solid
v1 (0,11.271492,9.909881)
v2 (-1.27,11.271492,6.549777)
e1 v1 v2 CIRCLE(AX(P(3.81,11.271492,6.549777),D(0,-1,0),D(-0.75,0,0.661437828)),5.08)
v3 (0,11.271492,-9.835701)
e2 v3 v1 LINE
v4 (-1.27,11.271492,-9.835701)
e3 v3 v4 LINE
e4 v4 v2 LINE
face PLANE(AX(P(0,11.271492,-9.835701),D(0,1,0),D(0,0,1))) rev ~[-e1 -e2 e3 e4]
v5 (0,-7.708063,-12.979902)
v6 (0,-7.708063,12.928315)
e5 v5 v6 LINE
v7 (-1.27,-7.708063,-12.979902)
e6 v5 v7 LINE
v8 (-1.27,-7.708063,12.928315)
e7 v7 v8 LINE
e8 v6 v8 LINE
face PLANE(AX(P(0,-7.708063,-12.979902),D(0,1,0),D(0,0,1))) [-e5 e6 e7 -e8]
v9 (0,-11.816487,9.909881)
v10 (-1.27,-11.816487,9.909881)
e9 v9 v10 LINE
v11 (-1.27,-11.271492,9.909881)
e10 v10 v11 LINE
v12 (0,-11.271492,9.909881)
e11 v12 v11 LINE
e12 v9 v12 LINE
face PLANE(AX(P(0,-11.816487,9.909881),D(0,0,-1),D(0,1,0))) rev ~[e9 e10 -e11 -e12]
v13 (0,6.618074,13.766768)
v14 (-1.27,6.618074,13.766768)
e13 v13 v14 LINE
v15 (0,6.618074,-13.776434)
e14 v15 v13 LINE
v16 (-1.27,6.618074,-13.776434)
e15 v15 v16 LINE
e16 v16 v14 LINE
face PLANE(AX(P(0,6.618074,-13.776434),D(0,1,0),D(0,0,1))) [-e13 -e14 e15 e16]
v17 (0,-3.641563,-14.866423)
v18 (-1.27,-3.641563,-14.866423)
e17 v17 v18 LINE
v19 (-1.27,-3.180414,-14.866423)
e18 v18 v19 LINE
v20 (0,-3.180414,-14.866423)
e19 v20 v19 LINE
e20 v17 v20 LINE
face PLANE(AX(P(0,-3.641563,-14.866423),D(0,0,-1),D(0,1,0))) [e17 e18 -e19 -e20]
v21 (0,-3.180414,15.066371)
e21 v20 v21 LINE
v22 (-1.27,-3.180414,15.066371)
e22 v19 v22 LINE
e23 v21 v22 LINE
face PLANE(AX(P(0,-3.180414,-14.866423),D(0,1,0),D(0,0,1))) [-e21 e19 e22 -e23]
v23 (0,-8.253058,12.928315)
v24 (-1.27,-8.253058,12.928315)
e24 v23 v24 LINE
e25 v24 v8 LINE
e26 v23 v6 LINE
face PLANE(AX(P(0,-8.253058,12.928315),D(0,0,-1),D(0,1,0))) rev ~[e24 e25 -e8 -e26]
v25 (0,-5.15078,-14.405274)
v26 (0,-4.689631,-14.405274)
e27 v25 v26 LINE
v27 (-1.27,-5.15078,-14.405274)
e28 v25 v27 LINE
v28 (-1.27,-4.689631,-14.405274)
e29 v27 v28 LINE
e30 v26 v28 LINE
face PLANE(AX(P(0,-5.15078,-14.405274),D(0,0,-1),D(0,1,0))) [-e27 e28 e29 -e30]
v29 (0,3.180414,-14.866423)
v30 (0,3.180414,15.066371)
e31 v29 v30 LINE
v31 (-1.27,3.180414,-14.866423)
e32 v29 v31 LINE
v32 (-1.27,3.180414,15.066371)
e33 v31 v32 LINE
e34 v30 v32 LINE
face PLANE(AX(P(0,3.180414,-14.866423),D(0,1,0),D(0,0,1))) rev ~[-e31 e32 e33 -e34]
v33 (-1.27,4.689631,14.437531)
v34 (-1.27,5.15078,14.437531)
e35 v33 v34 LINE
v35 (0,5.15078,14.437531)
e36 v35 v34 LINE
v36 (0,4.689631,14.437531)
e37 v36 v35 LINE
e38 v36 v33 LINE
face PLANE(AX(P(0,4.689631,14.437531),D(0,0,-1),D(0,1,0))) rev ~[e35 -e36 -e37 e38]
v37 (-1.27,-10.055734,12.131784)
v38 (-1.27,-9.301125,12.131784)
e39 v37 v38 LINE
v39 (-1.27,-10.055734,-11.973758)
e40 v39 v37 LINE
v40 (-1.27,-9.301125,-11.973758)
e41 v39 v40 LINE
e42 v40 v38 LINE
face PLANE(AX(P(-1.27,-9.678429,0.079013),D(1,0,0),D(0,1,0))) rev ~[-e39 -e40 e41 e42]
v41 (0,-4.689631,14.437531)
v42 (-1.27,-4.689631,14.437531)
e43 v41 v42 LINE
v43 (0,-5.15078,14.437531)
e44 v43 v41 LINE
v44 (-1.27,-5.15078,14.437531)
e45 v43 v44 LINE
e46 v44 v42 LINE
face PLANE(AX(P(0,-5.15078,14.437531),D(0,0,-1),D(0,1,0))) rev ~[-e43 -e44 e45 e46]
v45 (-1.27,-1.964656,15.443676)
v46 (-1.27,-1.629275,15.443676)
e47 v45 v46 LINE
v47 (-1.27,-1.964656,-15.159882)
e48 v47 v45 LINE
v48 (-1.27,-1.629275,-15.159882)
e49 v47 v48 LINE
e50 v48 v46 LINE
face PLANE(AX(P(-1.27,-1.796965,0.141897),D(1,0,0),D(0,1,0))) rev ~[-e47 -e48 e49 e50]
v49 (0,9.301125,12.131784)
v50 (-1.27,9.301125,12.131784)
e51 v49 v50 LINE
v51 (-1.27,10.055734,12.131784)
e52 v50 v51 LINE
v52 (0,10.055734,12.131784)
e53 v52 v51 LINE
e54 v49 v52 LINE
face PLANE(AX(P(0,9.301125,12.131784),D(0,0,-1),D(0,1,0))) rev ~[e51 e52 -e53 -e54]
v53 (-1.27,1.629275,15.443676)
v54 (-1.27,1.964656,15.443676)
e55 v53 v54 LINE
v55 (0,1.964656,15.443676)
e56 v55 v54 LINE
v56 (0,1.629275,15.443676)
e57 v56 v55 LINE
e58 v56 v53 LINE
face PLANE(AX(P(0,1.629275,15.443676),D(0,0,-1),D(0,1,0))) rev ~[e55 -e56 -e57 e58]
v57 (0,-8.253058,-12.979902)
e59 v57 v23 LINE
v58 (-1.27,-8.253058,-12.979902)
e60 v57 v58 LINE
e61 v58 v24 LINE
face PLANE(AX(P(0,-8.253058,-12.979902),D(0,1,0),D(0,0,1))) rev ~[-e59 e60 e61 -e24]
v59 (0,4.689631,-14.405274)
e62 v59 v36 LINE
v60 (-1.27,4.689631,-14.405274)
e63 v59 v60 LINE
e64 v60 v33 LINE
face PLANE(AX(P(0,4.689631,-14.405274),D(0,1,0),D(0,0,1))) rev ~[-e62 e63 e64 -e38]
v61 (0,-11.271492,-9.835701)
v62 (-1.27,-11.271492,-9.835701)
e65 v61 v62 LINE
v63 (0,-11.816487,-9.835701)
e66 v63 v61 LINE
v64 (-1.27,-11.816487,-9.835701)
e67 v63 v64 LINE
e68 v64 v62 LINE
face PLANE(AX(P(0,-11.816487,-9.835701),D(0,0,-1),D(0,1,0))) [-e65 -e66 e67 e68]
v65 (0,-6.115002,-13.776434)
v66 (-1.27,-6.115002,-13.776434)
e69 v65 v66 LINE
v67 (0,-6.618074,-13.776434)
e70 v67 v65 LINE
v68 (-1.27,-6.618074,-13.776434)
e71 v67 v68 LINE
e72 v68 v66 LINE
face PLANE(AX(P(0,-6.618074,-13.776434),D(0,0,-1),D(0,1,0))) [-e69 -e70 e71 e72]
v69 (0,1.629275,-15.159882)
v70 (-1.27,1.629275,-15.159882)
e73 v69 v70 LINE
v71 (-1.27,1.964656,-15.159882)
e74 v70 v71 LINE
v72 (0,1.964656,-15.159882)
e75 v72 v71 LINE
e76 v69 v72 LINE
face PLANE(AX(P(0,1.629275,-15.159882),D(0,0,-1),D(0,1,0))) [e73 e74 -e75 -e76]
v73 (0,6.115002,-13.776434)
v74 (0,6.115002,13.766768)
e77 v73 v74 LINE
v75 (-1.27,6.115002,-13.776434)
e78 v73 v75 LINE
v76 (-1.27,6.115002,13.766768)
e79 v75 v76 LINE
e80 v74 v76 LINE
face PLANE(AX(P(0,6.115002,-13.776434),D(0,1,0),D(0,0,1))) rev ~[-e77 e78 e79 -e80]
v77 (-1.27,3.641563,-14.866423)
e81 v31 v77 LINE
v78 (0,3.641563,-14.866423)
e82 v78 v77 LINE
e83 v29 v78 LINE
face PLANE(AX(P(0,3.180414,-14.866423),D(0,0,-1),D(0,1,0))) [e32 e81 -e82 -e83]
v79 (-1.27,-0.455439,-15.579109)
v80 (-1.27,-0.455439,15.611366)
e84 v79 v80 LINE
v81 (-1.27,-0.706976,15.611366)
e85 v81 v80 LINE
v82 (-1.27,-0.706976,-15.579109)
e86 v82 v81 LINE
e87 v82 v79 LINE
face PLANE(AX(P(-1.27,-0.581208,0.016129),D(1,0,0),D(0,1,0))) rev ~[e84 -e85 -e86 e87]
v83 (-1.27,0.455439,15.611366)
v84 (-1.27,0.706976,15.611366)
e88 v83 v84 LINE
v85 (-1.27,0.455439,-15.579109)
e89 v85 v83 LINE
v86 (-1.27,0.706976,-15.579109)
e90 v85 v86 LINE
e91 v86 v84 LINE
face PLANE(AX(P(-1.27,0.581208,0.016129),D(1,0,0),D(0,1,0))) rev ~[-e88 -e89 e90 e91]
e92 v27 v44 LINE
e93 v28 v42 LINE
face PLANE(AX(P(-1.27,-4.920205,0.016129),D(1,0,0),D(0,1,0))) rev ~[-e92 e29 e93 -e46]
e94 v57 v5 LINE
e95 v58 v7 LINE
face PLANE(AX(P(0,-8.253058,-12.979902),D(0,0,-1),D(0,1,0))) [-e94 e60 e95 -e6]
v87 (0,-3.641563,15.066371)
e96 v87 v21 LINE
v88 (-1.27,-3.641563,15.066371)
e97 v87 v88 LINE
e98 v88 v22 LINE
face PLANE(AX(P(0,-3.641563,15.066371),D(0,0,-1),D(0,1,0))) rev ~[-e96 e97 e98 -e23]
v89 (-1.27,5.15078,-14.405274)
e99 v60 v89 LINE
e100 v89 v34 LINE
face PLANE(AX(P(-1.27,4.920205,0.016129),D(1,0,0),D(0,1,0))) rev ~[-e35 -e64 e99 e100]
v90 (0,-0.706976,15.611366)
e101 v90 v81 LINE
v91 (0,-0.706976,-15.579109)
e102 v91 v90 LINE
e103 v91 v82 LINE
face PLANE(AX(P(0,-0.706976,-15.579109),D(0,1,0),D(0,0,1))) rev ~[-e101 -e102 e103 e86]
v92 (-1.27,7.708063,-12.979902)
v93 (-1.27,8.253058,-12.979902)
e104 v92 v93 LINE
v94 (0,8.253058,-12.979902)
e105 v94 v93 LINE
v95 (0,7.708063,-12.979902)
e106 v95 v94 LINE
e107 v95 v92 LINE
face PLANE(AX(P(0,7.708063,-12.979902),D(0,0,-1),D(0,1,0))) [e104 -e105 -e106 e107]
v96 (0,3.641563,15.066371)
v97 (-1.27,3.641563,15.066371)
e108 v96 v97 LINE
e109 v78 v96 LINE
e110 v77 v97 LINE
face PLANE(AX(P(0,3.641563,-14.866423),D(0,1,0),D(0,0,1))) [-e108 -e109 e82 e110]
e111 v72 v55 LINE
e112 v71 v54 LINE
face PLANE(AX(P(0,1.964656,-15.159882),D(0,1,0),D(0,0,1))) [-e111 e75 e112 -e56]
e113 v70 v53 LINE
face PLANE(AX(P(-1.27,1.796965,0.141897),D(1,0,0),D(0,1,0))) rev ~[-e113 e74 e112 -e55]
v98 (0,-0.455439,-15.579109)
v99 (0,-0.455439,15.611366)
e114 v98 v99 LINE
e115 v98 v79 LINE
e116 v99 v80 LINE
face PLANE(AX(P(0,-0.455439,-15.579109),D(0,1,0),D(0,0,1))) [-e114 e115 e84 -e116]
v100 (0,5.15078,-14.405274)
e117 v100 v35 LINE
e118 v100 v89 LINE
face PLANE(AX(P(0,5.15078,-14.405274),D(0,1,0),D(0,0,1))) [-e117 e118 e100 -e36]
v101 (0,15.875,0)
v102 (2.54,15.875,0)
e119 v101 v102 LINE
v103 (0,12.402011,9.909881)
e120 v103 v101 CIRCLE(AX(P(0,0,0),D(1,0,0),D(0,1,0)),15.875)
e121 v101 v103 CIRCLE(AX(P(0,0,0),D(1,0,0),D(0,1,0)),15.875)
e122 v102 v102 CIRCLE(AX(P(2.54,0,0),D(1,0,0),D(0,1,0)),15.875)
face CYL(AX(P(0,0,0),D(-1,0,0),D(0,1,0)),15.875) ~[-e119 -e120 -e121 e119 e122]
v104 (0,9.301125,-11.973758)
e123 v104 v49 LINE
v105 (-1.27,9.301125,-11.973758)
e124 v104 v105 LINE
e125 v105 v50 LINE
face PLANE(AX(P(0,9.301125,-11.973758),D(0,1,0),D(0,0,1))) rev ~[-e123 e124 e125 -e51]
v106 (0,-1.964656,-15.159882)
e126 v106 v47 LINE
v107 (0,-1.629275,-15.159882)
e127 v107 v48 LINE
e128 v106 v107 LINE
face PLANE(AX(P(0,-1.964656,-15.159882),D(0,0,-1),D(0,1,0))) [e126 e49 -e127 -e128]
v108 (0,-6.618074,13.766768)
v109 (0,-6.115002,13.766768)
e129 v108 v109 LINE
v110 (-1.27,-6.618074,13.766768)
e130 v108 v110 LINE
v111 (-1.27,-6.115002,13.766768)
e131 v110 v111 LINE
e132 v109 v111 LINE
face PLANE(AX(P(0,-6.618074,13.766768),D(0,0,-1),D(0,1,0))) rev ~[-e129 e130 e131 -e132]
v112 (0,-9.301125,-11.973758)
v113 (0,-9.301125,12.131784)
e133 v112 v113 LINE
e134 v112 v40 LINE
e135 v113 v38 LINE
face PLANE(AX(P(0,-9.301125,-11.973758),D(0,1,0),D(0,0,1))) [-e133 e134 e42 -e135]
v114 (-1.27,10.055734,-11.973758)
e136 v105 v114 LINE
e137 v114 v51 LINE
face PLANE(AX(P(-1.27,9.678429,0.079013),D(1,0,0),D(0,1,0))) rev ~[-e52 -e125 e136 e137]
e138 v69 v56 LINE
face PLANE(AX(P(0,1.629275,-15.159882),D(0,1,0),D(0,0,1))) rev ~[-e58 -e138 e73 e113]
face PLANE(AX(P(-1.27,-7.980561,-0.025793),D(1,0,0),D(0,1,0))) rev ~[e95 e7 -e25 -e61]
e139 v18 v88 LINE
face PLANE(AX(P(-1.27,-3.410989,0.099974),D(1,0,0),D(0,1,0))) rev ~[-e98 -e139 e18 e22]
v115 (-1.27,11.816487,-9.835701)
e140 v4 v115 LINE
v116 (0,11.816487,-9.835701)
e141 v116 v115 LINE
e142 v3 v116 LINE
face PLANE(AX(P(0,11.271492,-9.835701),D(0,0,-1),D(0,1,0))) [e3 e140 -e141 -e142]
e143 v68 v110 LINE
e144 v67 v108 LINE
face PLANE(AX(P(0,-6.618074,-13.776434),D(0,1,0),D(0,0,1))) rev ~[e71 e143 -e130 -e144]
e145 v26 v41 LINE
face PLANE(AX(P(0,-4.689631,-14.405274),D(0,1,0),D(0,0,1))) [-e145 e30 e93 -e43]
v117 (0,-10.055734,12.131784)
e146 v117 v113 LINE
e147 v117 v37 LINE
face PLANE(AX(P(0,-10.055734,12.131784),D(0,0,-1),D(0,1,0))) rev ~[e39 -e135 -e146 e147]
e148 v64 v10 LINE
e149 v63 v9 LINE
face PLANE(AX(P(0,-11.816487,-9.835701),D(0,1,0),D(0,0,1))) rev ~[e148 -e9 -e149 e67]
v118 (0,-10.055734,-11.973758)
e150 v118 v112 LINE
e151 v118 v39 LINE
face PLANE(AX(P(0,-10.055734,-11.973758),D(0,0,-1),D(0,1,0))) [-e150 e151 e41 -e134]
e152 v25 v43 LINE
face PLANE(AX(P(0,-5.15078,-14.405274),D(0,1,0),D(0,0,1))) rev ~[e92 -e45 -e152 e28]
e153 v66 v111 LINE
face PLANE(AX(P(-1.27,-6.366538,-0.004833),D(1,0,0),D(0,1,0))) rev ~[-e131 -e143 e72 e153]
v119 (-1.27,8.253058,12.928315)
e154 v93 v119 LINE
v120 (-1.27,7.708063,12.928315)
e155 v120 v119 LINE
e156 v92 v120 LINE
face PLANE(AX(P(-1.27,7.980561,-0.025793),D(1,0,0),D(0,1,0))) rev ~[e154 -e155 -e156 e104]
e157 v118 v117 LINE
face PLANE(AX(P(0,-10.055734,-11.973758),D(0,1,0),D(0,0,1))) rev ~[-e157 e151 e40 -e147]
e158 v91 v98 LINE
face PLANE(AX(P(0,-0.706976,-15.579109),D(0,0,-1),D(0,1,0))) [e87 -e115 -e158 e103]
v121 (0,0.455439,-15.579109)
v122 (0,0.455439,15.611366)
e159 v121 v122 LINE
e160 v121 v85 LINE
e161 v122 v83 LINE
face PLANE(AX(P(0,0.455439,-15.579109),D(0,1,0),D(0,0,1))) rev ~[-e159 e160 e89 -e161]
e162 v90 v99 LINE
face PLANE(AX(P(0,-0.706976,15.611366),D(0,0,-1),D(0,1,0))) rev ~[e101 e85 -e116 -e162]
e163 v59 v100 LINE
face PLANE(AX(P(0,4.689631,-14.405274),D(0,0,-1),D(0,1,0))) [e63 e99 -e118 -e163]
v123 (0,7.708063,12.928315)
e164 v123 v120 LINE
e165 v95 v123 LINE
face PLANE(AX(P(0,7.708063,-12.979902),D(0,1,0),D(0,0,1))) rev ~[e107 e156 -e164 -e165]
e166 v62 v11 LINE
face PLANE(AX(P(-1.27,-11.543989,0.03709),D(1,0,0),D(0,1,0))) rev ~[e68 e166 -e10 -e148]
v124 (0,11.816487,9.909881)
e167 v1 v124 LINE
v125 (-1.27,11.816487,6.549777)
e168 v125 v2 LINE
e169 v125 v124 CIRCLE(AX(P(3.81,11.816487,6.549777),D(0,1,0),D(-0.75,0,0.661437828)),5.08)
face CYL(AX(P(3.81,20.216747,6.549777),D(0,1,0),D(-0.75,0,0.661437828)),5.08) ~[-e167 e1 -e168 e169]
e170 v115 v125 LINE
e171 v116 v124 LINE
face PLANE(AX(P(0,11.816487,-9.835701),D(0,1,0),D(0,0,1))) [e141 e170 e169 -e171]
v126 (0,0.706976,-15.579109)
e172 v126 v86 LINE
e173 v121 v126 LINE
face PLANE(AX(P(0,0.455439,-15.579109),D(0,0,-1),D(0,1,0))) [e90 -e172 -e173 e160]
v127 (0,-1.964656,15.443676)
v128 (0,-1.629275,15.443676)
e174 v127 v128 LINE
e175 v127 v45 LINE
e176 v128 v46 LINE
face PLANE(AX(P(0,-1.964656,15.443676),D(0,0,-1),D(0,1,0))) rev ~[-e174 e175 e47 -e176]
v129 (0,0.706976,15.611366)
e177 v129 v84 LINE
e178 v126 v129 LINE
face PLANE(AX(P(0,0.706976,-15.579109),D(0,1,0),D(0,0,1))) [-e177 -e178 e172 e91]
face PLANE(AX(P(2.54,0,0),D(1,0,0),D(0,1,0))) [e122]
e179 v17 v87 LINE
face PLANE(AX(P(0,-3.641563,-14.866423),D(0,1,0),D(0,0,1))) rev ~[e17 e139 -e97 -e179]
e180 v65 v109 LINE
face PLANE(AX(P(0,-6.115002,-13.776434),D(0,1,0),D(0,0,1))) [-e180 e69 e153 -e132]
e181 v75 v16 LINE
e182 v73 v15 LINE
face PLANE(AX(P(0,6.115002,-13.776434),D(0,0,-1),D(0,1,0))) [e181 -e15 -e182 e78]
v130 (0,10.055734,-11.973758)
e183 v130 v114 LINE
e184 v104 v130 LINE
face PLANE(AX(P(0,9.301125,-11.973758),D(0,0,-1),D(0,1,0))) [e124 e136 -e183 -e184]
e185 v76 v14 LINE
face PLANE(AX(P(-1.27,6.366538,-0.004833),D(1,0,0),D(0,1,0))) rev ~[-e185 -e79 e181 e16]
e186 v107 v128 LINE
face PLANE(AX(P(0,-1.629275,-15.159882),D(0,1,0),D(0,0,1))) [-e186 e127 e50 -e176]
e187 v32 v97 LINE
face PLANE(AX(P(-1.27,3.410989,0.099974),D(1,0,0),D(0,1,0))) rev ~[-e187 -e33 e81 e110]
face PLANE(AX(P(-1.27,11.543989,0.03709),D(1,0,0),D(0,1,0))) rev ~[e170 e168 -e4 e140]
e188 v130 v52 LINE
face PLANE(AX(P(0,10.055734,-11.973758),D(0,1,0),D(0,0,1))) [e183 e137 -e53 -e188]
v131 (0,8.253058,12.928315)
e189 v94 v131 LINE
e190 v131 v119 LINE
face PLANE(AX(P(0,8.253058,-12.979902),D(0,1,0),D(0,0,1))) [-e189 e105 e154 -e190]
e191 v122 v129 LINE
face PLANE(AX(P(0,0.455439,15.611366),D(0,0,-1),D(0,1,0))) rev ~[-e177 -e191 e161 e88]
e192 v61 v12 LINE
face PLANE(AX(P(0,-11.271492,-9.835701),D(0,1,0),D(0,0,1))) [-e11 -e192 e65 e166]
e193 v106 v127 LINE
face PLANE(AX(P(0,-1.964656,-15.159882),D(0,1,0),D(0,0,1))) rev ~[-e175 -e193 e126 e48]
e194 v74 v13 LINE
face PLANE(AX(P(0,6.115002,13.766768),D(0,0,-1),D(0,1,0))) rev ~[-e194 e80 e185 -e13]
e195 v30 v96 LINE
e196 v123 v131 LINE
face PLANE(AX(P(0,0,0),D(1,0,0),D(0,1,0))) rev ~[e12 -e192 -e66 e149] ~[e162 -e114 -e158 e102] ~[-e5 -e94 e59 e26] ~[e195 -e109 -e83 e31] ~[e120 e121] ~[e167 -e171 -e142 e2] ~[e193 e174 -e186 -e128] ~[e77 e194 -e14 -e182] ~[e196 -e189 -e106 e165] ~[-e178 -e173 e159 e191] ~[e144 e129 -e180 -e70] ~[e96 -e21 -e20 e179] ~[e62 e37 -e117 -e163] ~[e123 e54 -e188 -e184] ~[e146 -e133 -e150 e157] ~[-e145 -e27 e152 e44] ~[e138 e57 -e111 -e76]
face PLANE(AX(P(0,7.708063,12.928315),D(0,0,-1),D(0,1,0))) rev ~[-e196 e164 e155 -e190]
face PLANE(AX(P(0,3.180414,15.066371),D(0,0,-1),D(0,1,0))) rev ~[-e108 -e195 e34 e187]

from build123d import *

# Parameters (mm, degrees)
F0_R        = 15.875
F1_DEPTH    = 2.54
F2_W        = 0.2515364613
F2_H        = 31.190475449
F2_W_2      = 0.335381832
F2_H_2      = 30.6035578251
F2_W_3      = 0.4611494951
F2_H_3      = 29.9327941611
F2_H_4      = 28.8428049535
F2_W_4      = 0.5030720495
F2_H_5      = 27.5432020426
F2_W_5      = 0.5449950695
F2_H_6      = 25.9082177654
F2_W_6      = 0.7546087727
F2_H_7      = 24.1055423394
F2_H_8      = 19.7455827147
F3_DEPTH    = 1.27
F4_T1_DEPTH = 8.9452554821


# Not quite as in the source:
# - a fillet or chamfer that OpenCascade refuses, or shapes differently, is made with other operations: its cross-section is extruded or revolved along the edge and cut away or added


with BuildPart() as f1:
    # F0 (on Right) → F1 (new body)
    with BuildSketch(Plane.YZ):
        Circle(F0_R)
    extrude(amount=F1_DEPTH)

    # F2 (on Right) → F3 (join)
    with BuildSketch(Plane.YZ):
        with Locations((-0.5812076997, 0.0161286443)):
            Rectangle(F2_W, F2_H)
        with Locations((-1.7969654873, 0.1418972388)):
            Rectangle(F2_W_2, F2_H_2)
        with Locations((-3.4109887201, 0.0999742188)):
            Rectangle(F2_W_3, F2_H_3)
        with Locations((-4.9202053342, 0.0161286443)):
            Rectangle(F2_W_3, F2_H_4)
        with Locations((-6.366537651, -0.0048326328)):
            Rectangle(F2_W_4, F2_H_5)
        with Locations((-7.9805608839, -0.0257934444)):
            Rectangle(F2_W_5, F2_H_6)
        with Locations((-9.6784294583, 0.0790129416)):
            Rectangle(F2_W_6, F2_H_7)
        with Locations((-11.5439891815, 0.0370899215)):
            Rectangle(F2_W_5, F2_H_8)
        with Locations((0.5812076997, 0.0161286443)):
            Rectangle(F2_W, F2_H)
        with Locations((11.5439891815, 0.0370899215)):
            Rectangle(F2_W_5, F2_H_8)
        with Locations((1.7969654873, 0.1418972388)):
            Rectangle(F2_W_2, F2_H_2)
        with Locations((3.4109887201, 0.0999742188)):
            Rectangle(F2_W_3, F2_H_3)
        with Locations((4.9202053342, 0.0161286443)):
            Rectangle(F2_W_3, F2_H_4)
        with Locations((9.6784294583, 0.0790129416)):
            Rectangle(F2_W_6, F2_H_7)
        with Locations((7.9805608839, -0.0257934444)):
            Rectangle(F2_W_5, F2_H_6)
        with Locations((6.366537651, -0.0048326328)):
            Rectangle(F2_W_4, F2_H_5)
    extrude(amount=-F3_DEPTH)

    # F4: fillet of radius 5.08 on 1 edges, made by hand

    # F4_s2 → F4_t1 (cut)
    with BuildSketch(Plane.XZ.offset(-20.2167471289)):
        with BuildLine():
            ThreePointArc((0, 9.9098812789), (-0.9419048812, 8.345828338), (-1.27, 6.5497771138))
            Line((-1.27, 6.5497771138), (-1.27, 9.9098812789))
            Line((-1.27, 9.9098812789), (0, 9.9098812789))
        make_face()
    extrude(amount=F4_T1_DEPTH, mode=Mode.SUBTRACT)


solid = f1.part
